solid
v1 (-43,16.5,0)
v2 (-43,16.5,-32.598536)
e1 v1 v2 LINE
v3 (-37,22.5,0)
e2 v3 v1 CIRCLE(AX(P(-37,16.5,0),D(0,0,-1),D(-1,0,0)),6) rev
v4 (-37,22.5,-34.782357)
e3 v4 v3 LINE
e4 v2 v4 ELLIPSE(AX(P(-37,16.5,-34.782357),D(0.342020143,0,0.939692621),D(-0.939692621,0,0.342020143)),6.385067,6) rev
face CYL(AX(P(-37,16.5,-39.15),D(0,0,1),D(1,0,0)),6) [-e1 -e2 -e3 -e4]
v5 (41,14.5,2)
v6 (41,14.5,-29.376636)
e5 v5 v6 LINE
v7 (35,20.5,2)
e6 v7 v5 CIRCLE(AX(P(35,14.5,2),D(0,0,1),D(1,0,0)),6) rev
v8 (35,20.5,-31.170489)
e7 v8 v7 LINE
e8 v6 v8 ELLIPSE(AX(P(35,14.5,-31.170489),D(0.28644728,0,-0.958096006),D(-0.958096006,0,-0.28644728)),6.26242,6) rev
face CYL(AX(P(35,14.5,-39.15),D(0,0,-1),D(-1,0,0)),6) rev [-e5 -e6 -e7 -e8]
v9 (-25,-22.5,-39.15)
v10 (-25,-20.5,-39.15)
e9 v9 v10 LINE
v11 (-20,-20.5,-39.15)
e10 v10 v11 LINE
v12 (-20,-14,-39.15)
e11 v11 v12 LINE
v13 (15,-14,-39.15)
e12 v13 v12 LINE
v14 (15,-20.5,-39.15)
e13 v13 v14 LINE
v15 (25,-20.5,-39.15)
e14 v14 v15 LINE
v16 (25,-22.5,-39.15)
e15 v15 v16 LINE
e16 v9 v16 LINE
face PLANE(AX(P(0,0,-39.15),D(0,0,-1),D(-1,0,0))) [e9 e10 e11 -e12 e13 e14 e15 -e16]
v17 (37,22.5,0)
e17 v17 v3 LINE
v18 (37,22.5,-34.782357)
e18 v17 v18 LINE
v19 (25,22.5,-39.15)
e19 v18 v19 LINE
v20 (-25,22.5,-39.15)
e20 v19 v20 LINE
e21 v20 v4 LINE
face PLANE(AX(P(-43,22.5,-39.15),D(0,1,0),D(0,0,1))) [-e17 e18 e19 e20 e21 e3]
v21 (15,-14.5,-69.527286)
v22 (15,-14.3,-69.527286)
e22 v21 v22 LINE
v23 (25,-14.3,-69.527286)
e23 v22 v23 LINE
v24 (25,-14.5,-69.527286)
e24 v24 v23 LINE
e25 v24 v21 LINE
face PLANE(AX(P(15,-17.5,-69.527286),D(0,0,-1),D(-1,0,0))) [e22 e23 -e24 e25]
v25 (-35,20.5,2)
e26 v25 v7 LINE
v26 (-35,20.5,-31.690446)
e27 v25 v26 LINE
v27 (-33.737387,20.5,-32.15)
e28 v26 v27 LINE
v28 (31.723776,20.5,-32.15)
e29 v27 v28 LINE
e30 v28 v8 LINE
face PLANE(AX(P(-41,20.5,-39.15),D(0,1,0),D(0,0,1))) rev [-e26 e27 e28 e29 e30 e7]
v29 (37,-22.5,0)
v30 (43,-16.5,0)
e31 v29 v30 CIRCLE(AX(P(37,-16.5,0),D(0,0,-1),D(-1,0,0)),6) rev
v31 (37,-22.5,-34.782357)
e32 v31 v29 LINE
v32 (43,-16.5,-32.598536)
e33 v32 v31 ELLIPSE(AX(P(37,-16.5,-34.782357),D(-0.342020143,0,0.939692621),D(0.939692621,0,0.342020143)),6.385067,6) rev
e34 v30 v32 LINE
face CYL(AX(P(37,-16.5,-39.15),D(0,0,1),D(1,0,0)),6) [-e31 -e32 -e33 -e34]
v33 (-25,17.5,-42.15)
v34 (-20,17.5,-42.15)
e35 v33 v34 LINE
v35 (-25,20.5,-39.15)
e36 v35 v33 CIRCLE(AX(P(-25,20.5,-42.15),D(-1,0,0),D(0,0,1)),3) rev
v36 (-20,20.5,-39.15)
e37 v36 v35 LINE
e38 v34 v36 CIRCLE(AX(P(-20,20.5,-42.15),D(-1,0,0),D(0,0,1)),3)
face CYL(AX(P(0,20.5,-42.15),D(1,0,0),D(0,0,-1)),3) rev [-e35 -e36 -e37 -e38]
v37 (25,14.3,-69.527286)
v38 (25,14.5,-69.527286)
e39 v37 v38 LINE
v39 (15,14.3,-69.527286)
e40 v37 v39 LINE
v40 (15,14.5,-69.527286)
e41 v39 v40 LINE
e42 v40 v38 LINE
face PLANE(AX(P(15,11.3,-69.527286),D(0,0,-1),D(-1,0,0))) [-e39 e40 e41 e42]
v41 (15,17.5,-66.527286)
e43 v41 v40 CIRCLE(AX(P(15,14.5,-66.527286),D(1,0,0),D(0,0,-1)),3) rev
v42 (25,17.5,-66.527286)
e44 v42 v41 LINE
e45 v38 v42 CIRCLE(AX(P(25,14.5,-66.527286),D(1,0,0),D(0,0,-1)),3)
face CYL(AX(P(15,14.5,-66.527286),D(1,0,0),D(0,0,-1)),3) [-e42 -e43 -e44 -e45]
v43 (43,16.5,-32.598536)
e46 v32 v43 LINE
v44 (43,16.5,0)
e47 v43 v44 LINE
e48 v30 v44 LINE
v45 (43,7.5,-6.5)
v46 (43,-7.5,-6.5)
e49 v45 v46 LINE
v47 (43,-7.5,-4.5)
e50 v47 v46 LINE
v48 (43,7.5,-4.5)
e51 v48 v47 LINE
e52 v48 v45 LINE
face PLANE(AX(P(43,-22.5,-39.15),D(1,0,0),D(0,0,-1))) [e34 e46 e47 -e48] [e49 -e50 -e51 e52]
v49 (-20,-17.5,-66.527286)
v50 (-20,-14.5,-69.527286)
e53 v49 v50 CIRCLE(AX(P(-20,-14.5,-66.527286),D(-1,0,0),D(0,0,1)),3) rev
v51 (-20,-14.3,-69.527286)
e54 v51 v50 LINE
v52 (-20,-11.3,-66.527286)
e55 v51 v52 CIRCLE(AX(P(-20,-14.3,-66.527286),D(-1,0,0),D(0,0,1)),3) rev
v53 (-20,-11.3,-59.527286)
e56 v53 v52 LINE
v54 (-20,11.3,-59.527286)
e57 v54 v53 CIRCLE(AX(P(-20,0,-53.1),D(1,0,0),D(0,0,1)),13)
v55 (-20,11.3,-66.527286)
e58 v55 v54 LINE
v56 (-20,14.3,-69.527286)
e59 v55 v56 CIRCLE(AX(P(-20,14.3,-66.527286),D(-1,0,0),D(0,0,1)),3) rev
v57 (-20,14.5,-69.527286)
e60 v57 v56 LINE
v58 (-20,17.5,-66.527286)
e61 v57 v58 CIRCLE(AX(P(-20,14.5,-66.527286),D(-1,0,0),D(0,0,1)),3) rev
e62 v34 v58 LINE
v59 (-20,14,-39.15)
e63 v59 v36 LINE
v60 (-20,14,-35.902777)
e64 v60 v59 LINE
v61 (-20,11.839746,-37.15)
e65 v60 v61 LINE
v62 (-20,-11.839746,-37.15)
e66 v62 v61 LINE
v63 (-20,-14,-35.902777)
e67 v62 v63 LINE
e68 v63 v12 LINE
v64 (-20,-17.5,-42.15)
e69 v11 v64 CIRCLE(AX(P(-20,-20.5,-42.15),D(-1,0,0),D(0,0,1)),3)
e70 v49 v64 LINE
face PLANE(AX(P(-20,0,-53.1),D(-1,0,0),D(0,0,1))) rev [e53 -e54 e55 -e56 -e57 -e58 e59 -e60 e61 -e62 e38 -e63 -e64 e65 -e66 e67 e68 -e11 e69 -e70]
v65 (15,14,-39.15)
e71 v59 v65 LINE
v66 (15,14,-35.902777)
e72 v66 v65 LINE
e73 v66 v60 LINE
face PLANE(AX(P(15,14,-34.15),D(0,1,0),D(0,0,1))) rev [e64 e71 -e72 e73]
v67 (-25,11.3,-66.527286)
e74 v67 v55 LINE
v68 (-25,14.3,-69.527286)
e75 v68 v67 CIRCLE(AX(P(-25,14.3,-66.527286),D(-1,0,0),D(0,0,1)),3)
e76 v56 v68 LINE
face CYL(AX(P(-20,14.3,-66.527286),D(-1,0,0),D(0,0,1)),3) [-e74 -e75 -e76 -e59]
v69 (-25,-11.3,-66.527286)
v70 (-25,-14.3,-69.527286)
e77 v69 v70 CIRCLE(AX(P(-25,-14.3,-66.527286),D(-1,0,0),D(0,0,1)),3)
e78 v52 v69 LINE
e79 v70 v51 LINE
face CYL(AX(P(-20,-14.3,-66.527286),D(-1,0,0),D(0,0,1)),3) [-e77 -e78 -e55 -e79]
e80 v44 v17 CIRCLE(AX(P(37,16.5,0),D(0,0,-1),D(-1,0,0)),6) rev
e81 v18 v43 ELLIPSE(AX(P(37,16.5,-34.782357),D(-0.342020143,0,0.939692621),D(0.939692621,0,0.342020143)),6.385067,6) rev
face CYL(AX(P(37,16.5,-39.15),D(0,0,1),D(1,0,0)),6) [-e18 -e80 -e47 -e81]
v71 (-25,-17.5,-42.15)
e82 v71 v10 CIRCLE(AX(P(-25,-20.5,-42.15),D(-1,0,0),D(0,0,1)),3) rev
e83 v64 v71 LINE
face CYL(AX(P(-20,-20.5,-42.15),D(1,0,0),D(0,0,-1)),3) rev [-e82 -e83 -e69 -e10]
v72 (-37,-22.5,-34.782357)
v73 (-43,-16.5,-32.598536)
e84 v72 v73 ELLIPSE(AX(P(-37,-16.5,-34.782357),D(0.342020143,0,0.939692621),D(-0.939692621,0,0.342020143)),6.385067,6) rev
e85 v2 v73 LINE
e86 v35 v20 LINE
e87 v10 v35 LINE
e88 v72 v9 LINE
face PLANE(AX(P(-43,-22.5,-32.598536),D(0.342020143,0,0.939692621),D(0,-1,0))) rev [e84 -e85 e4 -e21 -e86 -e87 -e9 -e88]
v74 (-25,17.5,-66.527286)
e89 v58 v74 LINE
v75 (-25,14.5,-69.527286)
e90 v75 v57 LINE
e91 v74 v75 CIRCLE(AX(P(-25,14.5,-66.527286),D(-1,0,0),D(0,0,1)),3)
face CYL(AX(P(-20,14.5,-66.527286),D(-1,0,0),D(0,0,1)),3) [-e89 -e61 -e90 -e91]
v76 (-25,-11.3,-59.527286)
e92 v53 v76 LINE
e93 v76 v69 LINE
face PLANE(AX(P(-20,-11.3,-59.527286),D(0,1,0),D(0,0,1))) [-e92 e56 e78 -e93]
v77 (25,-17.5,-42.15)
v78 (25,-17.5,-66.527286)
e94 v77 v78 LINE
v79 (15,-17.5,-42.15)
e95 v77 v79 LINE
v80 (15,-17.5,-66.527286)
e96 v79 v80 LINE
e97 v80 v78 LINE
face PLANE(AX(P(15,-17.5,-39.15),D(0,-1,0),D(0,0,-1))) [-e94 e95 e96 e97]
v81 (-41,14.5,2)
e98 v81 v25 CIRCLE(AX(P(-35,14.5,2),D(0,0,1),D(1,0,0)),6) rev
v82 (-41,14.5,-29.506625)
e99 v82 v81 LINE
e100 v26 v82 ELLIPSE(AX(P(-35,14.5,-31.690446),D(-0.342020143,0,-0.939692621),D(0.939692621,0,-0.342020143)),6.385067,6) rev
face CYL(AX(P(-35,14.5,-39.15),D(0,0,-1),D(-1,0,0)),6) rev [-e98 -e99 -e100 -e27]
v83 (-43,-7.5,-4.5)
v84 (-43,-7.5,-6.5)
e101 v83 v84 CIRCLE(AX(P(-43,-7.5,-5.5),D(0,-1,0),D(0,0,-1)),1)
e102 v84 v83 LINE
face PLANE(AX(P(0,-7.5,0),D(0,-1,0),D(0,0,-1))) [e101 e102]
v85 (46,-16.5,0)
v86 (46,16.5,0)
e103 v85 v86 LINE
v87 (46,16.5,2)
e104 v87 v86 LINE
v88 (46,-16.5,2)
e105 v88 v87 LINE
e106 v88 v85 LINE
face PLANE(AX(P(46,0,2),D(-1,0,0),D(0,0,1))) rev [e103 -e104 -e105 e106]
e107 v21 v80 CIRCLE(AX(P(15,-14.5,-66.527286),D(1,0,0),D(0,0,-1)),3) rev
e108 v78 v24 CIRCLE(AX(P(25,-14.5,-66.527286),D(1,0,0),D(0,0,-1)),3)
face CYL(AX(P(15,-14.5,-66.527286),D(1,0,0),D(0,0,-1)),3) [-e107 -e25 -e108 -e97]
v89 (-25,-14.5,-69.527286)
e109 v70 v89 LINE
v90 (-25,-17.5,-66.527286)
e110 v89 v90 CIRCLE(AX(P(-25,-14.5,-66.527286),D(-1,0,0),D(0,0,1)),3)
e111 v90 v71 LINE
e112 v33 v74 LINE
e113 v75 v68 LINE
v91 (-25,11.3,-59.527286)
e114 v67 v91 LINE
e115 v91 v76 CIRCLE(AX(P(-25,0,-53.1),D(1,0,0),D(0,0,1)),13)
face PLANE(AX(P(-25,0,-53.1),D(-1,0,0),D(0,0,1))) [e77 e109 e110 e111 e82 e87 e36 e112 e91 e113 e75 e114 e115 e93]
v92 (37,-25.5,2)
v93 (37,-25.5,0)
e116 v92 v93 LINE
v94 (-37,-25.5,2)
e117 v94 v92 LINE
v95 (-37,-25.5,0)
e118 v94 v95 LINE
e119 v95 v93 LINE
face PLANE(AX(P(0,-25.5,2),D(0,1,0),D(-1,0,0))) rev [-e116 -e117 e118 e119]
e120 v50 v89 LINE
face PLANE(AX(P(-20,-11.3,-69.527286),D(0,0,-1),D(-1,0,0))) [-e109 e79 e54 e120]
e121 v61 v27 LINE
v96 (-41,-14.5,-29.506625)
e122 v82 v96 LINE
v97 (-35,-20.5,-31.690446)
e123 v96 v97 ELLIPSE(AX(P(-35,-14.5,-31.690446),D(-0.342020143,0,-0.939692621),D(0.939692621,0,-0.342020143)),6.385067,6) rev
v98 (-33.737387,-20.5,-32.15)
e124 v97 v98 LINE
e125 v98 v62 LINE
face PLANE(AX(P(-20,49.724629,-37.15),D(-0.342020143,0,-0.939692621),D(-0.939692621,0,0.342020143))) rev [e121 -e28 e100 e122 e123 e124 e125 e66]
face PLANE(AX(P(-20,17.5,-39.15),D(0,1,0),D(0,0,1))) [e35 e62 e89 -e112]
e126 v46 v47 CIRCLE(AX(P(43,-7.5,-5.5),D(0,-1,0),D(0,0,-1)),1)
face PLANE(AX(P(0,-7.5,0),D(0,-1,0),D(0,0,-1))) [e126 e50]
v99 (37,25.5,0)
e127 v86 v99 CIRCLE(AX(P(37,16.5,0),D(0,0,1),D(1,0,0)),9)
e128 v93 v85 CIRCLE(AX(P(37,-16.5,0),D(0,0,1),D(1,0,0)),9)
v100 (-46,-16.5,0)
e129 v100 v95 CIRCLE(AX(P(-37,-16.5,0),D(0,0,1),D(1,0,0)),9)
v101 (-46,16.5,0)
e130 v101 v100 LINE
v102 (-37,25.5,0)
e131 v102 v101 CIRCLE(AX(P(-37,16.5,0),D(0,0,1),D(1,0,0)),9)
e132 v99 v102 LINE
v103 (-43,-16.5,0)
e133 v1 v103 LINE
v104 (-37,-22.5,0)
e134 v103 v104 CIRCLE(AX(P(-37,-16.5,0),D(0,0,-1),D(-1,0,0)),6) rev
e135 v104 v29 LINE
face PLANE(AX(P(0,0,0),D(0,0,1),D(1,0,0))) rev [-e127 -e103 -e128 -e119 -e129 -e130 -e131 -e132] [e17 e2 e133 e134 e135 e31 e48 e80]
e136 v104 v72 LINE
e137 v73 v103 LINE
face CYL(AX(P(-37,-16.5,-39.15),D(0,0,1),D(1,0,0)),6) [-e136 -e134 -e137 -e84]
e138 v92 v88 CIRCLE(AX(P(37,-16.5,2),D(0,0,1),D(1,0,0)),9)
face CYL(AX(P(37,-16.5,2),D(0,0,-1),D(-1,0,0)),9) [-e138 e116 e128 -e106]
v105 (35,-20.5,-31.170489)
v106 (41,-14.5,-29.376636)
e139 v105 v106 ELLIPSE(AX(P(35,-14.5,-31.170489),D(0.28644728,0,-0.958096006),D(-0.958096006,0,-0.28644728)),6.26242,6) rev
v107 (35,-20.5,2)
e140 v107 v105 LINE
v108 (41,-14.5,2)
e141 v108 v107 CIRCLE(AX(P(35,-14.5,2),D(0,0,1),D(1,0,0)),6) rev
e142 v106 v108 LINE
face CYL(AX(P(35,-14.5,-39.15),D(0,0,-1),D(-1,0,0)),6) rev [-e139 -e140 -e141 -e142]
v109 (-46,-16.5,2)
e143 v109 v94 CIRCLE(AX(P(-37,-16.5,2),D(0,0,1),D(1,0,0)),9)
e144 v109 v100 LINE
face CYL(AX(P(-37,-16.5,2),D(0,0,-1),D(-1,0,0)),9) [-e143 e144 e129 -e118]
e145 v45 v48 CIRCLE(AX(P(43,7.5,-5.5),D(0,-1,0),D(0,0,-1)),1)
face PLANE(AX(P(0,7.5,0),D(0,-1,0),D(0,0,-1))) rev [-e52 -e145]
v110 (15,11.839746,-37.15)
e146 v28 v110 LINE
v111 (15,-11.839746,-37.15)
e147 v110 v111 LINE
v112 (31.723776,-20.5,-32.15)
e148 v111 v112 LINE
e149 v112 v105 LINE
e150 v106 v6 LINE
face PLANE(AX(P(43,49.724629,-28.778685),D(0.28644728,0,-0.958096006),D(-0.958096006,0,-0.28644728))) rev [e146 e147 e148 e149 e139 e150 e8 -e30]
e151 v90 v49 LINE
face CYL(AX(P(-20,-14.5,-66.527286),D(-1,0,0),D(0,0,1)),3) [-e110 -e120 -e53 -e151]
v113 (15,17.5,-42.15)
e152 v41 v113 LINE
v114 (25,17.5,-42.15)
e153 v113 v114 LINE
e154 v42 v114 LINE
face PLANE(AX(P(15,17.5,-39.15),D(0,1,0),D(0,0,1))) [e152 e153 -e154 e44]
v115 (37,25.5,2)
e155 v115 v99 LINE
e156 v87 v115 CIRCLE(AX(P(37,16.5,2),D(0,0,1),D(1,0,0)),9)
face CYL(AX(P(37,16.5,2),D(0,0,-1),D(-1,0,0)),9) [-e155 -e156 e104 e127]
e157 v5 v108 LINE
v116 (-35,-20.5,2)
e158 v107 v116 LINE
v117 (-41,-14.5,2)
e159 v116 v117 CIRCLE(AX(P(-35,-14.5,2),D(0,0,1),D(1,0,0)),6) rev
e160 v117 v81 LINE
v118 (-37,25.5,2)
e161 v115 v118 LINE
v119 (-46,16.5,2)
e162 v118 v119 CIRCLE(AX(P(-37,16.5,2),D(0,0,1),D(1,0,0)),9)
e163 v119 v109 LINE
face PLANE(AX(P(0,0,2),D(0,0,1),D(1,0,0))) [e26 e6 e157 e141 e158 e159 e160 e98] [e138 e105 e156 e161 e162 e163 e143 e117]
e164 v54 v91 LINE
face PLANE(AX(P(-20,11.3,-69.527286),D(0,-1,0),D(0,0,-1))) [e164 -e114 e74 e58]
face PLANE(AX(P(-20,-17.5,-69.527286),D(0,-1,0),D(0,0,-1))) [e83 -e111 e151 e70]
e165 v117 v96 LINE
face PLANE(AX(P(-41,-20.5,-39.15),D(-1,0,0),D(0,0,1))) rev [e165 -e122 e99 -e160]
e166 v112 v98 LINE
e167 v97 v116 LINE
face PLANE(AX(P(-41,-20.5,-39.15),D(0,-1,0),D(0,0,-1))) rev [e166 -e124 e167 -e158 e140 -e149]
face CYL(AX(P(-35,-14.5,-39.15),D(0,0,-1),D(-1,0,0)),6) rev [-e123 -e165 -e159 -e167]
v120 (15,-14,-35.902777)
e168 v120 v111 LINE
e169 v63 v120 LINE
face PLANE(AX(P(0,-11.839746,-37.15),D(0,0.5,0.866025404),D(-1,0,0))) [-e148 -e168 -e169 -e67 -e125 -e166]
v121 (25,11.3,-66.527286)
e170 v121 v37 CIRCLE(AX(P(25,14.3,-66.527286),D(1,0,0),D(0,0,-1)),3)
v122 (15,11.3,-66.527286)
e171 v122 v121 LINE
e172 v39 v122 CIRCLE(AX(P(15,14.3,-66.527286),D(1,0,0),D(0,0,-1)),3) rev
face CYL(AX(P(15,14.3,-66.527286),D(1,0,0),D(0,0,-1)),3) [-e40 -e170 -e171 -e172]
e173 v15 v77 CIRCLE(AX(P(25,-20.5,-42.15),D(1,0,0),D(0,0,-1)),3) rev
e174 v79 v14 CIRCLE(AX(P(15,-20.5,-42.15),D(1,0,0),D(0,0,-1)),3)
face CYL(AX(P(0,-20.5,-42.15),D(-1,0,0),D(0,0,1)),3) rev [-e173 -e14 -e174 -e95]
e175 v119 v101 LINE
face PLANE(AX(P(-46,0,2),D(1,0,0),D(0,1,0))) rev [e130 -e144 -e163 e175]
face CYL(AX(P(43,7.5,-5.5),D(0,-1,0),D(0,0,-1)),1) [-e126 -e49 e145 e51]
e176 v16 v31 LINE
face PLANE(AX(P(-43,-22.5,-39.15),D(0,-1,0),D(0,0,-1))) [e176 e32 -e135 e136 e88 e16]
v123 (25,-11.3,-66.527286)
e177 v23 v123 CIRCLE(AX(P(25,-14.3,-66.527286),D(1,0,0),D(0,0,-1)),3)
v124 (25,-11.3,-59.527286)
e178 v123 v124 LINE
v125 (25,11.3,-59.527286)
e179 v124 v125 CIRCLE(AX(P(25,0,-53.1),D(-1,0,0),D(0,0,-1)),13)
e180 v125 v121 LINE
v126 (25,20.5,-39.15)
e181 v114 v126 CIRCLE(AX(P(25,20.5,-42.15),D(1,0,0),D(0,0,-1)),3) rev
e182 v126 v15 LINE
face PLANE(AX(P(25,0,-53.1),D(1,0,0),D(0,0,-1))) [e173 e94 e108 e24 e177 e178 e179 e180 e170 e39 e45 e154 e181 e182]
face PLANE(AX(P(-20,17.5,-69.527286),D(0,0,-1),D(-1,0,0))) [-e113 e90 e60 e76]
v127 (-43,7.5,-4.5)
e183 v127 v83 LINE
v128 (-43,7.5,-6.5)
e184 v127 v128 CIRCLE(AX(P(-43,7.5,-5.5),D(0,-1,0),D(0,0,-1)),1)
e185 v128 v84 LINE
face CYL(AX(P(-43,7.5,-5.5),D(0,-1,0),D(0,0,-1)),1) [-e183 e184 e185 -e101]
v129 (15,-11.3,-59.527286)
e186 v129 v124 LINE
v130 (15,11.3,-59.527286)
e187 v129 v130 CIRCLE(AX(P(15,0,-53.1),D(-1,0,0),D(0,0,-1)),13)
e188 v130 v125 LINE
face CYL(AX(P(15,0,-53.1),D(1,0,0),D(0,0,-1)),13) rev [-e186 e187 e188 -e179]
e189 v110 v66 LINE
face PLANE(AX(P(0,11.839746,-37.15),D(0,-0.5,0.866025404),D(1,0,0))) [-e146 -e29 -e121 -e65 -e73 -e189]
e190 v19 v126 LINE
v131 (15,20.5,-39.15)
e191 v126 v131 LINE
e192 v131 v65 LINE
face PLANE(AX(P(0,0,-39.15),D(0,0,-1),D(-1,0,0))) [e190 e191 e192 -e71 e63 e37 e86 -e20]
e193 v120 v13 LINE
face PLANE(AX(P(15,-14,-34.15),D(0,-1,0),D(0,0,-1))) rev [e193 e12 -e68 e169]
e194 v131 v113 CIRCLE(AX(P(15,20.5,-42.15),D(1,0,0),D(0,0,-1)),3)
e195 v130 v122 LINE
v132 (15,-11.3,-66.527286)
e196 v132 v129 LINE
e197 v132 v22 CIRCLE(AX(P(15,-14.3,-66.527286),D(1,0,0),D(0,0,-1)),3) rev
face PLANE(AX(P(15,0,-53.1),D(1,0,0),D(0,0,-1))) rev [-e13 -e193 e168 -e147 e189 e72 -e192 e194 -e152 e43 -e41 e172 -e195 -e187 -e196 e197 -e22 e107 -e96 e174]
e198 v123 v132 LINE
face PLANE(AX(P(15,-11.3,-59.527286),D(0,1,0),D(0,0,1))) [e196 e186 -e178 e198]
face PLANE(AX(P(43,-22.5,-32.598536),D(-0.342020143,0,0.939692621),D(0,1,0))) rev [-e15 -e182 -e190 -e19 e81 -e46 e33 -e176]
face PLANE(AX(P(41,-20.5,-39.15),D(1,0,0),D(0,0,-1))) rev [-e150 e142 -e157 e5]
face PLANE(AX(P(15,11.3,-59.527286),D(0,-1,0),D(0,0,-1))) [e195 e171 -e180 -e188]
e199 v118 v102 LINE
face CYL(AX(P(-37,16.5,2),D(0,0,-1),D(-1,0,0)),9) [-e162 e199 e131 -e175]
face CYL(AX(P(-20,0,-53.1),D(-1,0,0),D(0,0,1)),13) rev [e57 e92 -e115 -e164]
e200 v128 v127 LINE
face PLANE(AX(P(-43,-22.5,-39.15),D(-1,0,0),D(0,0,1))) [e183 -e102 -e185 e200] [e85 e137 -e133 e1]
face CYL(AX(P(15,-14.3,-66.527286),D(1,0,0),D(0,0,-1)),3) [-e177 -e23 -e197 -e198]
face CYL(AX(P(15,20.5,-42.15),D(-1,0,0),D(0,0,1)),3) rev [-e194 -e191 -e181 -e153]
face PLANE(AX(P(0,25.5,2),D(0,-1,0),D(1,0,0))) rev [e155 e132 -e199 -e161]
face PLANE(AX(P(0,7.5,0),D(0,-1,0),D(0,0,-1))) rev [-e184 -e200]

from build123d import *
from OCP.BRepFilletAPI import BRepFilletAPI_MakeChamfer

# Parameters (mm, degrees)
SKETCH1_W           = 86
SKETCH1_H           = 45
SKETCH1_W_2         = 82
SKETCH1_H_2         = 41
BOSS_EXTRUDE1_DEPTH = 39.15
SKETCH2_W           = 86
SKETCH2_H           = 45
BOSS_EXTRUDE2_DEPTH = 2
BOSS_EXTRUDE3_DEPTH = 10
BOSS_EXTRUDE4_START = -5
BOSS_EXTRUDE4_DEPTH = 5
FILLET2_R           = 3
SKETCH5_W           = 35
SKETCH5_H           = 28
CUT_EXTRUDE1_DEPTH  = 5
BOSS_EXTRUDE5_REACH = 94.369
CHAMFER1_SIZE       = 8.660254038
CHAMFER1_SIZE_2     = 5
CHAMFER2_SIZE       = 6.551464217
CHAMFER2_SIZE_2     = 18
FILLET3_R           = 6
BOSS_EXTRUDE6_DEPTH = 2
BOSS_EXTRUDE7_DEPTH = 15


# Some blends are built 0.0001 mm under size
with BuildPart() as part:
    # Sketch1 → Boss-Extrude1 (new body)
    with BuildSketch(Plane.XY):
        Rectangle(SKETCH1_W, SKETCH1_H)
        Rectangle(SKETCH1_W_2, SKETCH1_H_2, mode=Mode.SUBTRACT)
    extrude(amount=-BOSS_EXTRUDE1_DEPTH)

    # Sketch2 → Boss-Extrude2 (add)
    with BuildSketch(Plane(origin=(0, 0, -39.15), x_dir=(-1, 0, 0), z_dir=(0, 0, -1))):
        Rectangle(SKETCH2_W, SKETCH2_H)
    extrude(amount=-BOSS_EXTRUDE2_DEPTH)

    # Sketch3 → Boss-Extrude3 (add)
    with BuildSketch(Plane(origin=(25, 0, 0), x_dir=(0, 0, -1), z_dir=(1, 0, 0))):
        with BuildLine():
            Line((69.527285586, 11.3), (69.527285586, 17.5))
            Line((69.527285586, 17.5), (39.15, 17.5))
            Line((39.15, 17.5), (39.15, -17.5))
            Line((39.15, -17.5), (69.527285586, -17.5))
            Line((69.527285586, -17.5), (69.527285586, -11.3))
            Line((69.527285586, -11.3), (59.527285586, -11.3))
            ThreePointArc((59.527285586, -11.3), (40.1, 0), (59.527285586, 11.3))
            Line((59.527285586, 11.3), (69.527285586, 11.3))
        make_face()
    extrude(amount=-BOSS_EXTRUDE3_DEPTH)

    # Sketch4 → Boss-Extrude4 (add)
    with BuildSketch(Plane.ZY.offset(25).offset(BOSS_EXTRUDE4_START)):
        with BuildLine():
            Line((-39.15, -17.5), (-39.15, 17.5))
            Line((-39.15, 17.5), (-69.527285586, 17.5))
            Line((-69.527285586, 17.5), (-69.527285586, 11.3))
            Line((-69.527285586, 11.3), (-59.527285586, 11.3))
            ThreePointArc((-59.527285586, 11.3), (-40.1, 0), (-59.527285586, -11.3))
            Line((-59.527285586, -11.3), (-69.527285586, -11.3))
            Line((-69.527285586, -11.3), (-69.527285586, -17.5))
            Line((-69.527285586, -17.5), (-39.15, -17.5))
        make_face()
    extrude(amount=BOSS_EXTRUDE4_DEPTH)

    # Fillet2
    fillet2_edges = [part.edges().sort_by_distance(p)[0] for p in [
        (20, -11.3, -69.527285586),
        (20, -17.5, -69.527285586),
        (20, -17.5, -39.15),
        (20, 17.5, -39.15),
        (20, 17.5, -69.527285586),
        (20, 11.3, -69.527285586),
        (-22.5, -17.5, -39.15),
        (-22.5, -17.5, -69.527285586),
        (-22.5, -11.3, -69.527285586),
        (-22.5, 11.3, -69.527285586),
        (-22.5, 17.5, -69.527285586),
        (-22.5, 17.5, -39.15),
    ]]
    fillet(fillet2_edges, radius=FILLET2_R)

    # Sketch5 → Cut-Extrude1 (cut)
    with BuildSketch(Plane(origin=(0, 0, -39.15), x_dir=(-1, 0, 0), z_dir=(0, 0, -1))):
        with Locations((2.5, 0)):
            Rectangle(SKETCH5_W, SKETCH5_H)
    extrude(amount=-CUT_EXTRUDE1_DEPTH, mode=Mode.SUBTRACT)

    # Boss-Extrude5: up to this face of the body (flat: up to its plane)
    boss_extrude5_end = Plane(part.part.faces().sort_by_distance((0, 20.5, -18.575))[0])
    # Sketch6 → Boss-Extrude5 (add, up to the picked face)
    with BuildSketch(Plane(origin=(0, -20.5, 0), x_dir=(1, 0, 0), z_dir=(0, 1, 0)), mode=Mode.PRIVATE) as boss_extrude5_sk1:
        Polygon((-20, 37.15), (-43, 28.778684612), (-43, 37.15), align=None)
    boss_extrude5_tool1 = split(extrude(boss_extrude5_sk1.sketch, amount=BOSS_EXTRUDE5_REACH, mode=Mode.PRIVATE), bisect_by=boss_extrude5_end, keep=Keep.BOTH, mode=Mode.PRIVATE)
    # Sketch6 → Boss-Extrude5 (add, up to the picked face)
    with BuildSketch(Plane(origin=(0, -20.5, 0), x_dir=(1, 0, 0), z_dir=(0, 1, 0)), mode=Mode.PRIVATE) as boss_extrude5_sk2:
        Polygon((15, 37.15), (43, 37.15), (43, 28.778684612), align=None)
    boss_extrude5_tool2 = split(extrude(boss_extrude5_sk2.sketch, amount=BOSS_EXTRUDE5_REACH, mode=Mode.PRIVATE), bisect_by=boss_extrude5_end, keep=Keep.BOTH, mode=Mode.PRIVATE)
    add(boss_extrude5_tool1.solids().sort_by(Axis((-35.333333, -20.5, -34.359562), (0, 1, 0)))[0])
    add(boss_extrude5_tool2.solids().sort_by(Axis((33.666667, -20.5, -34.359562), (0, 1, 0)))[0])

    # Chamfer1
    # the kernel refuses this chamfer: 8.660254038, 5 mm, written as the material it adds along each edge
    with BuildSketch(Plane(origin=(-42.404819853, 20.5, -37.15), x_dir=(0, -0.999813220622208, -0.019326765612700494), z_dir=(1, 0, 0))) as chamfer1_piece_1_section:
        Polygon((CHAMFER1_SIZE * 0.999813220604, -CHAMFER1_SIZE * 0.0193267656124), (-CHAMFER1_SIZE_2 * 0.0193267656127, -CHAMFER1_SIZE_2 * 0.999813220622), (0, 0), align=None)
    chamfer1_piece_1 = extrude(amount=79.809639706, mode=Mode.PRIVATE)
    chamfer1_piece_1 = split(chamfer1_piece_1, bisect_by=Plane(origin=(-20, 13.459936491, -36.526388375), z_dir=(-1, 0, 0)), keep=Keep.TOP, mode=Mode.PRIVATE)
    add(chamfer1_piece_1)
    with BuildSketch(Plane(origin=(-42.404819853, 20.5, -37.15), x_dir=(0, -0.999813220622208, -0.019326765612700494), z_dir=(1, 0, 0))) as chamfer1_piece_2_section:
        Polygon((CHAMFER1_SIZE * 0.999813220604, -CHAMFER1_SIZE * 0.0193267656124), (-CHAMFER1_SIZE_2 * 0.0193267656127, -CHAMFER1_SIZE_2 * 0.999813220622), (0, 0), align=None)
    chamfer1_piece_2 = extrude(amount=79.809639706, mode=Mode.PRIVATE)
    chamfer1_piece_2 = split(chamfer1_piece_2, bisect_by=Plane(origin=(-2.5, 14, -35.400332947), z_dir=(0, 1, 0)), keep=Keep.TOP, mode=Mode.PRIVATE)
    add(chamfer1_piece_2)
    with BuildSketch(Plane(origin=(-42.404819853, 20.5, -37.15), x_dir=(0, -0.999813220622208, -0.019326765612700494), z_dir=(1, 0, 0))) as chamfer1_piece_3_section:
        Polygon((CHAMFER1_SIZE * 0.999813220604, -CHAMFER1_SIZE * 0.0193267656124), (-CHAMFER1_SIZE_2 * 0.0193267656127, -CHAMFER1_SIZE_2 * 0.999813220622), (0, 0), align=None)
    chamfer1_piece_3 = extrude(amount=79.809639706, mode=Mode.PRIVATE)
    chamfer1_piece_3 = split(chamfer1_piece_3, bisect_by=Plane(origin=(15, 13.459936491, -36.526388375), z_dir=(1, 0, 0)), keep=Keep.TOP, mode=Mode.PRIVATE)
    add(chamfer1_piece_3)
    with BuildSketch(Plane(origin=(37.404819853, -20.5, -37.15), x_dir=(0, 0.999813220622208, -0.019326765612700494), z_dir=(-1, 0, 0))) as chamfer1_piece_4_section:
        Polygon((CHAMFER1_SIZE * 0.999813220604, -CHAMFER1_SIZE * 0.0193267656124), (-CHAMFER1_SIZE_2 * 0.0193267656127, -CHAMFER1_SIZE_2 * 0.999813220622), (0, 0), align=None)
    chamfer1_piece_4 = extrude(amount=79.809639706, mode=Mode.PRIVATE)
    chamfer1_piece_4 = split(chamfer1_piece_4, bisect_by=Plane(origin=(15, -13.459936491, -36.526388375), z_dir=(1, 0, 0)), keep=Keep.TOP, mode=Mode.PRIVATE)
    add(chamfer1_piece_4)
    with BuildSketch(Plane(origin=(37.404819853, -20.5, -37.15), x_dir=(0, 0.999813220622208, -0.019326765612700494), z_dir=(-1, 0, 0))) as chamfer1_piece_5_section:
        Polygon((CHAMFER1_SIZE * 0.999813220604, -CHAMFER1_SIZE * 0.0193267656124), (-CHAMFER1_SIZE_2 * 0.0193267656127, -CHAMFER1_SIZE_2 * 0.999813220622), (0, 0), align=None)
    chamfer1_piece_5 = extrude(amount=79.809639706, mode=Mode.PRIVATE)
    chamfer1_piece_5 = split(chamfer1_piece_5, bisect_by=Plane(origin=(-2.5, -14, -35.400332947), z_dir=(0, -1, 0)), keep=Keep.TOP, mode=Mode.PRIVATE)
    add(chamfer1_piece_5)
    with BuildSketch(Plane(origin=(37.404819853, -20.5, -37.15), x_dir=(0, 0.999813220622208, -0.019326765612700494), z_dir=(-1, 0, 0))) as chamfer1_piece_6_section:
        Polygon((CHAMFER1_SIZE * 0.999813220604, -CHAMFER1_SIZE * 0.0193267656124), (-CHAMFER1_SIZE_2 * 0.0193267656127, -CHAMFER1_SIZE_2 * 0.999813220622), (0, 0), align=None)
    chamfer1_piece_6 = extrude(amount=79.809639706, mode=Mode.PRIVATE)
    chamfer1_piece_6 = split(chamfer1_piece_6, bisect_by=Plane(origin=(-20, -13.459936491, -36.526388375), z_dir=(-1, 0, 0)), keep=Keep.TOP, mode=Mode.PRIVATE)
    add(chamfer1_piece_6)

    # Chamfer2
    chamfer2_edges_1 = [part.edges().sort_by_distance(p)[0] for p in [
        (-43, 0, -39.15),
    ]]
    chamfer2_side_1 = [part.faces().sort_by_distance(p)[0] for p in [
        (-43, 0, -39.018970716),
    ]]
    chamfer2_edges_2 = [part.edges().sort_by_distance(p)[0] for p in [
        (43, 0, -39.15),
    ]]
    chamfer2_side_2 = [part.faces().sort_by_distance(p)[0] for p in [
        (42.868970716, 0, -39.15),
    ]]
    chamfer2 = BRepFilletAPI_MakeChamfer(part.part.solid().wrapped)
    for e in chamfer2_edges_1:
        chamfer2.Add(CHAMFER2_SIZE - 0.0001, CHAMFER2_SIZE_2 - 0.0001, e.wrapped, chamfer2_side_1[0].wrapped)
    for e in chamfer2_edges_2:
        chamfer2.Add(CHAMFER2_SIZE_2 - 0.0001, CHAMFER2_SIZE - 0.0001, e.wrapped, chamfer2_side_2[0].wrapped)
    add(Compound.cast(chamfer2.Shape()), mode=Mode.REPLACE)  # a hair under: the kernel refuses the full size

    # Fillet3
    fillet3_edges = [part.edges().sort_by_distance(p)[0] for p in [
        (41, -20.5, -14.688317856),
        (41, 20.5, -14.688317856),
        (-41, 20.5, -14.75331254),
        (-41, -20.5, -14.75331254),
        (-43, -22.5, -16.299317891),
        (-43, 22.5, -16.299317891),
        (43, -22.5, -16.299317891),
        (43, 22.5, -16.299317891),
    ]]
    fillet(fillet3_edges, radius=FILLET3_R)

    # Sketch7 → Boss-Extrude6 (add)
    # profile 1 of 2: a face of its own
    with BuildSketch(Plane.XY):
        with BuildLine():
            Line((46, -16.5), (46, 16.5))
            ThreePointArc((46, 16.5), (43.363961031, 22.863961031), (37, 25.5))
            Line((37, 25.5), (-37, 25.5))
            ThreePointArc((-37, 25.5), (-43.363961031, 22.863961031), (-46, 16.5))
            Line((-46, 16.5), (-46, -16.5))
            ThreePointArc((-46, -16.5), (-43.363961031, -22.863961031), (-37, -25.5))
            Line((-37, -25.5), (37, -25.5))
            ThreePointArc((37, -25.5), (43.363961031, -22.863961031), (46, -16.5))
        make_face()
        with BuildLine():
            Line((37, 22.5), (-37, 22.5))
            ThreePointArc((-37, 22.5), (-41.242640687, 20.742640687), (-43, 16.5))
            Line((-43, 16.5), (-43, -16.5))
            ThreePointArc((-43, -16.5), (-41.242640687, -20.742640687), (-37, -22.5))
            Line((-37, -22.5), (37, -22.5))
            ThreePointArc((37, -22.5), (41.242640687, -20.742640687), (43, -16.5))
            Line((43, -16.5), (43, 16.5))
            ThreePointArc((43, 16.5), (41.242640687, 20.742640687), (37, 22.5))
        make_face(mode=Mode.SUBTRACT)
    # profile 2 of 2: a face of its own
    with BuildSketch(Plane.XY):
        with BuildLine():
            ThreePointArc((43, 16.5), (41.242640687, 20.742640687), (37, 22.5))
            Line((37, 22.5), (-37, 22.5))
            ThreePointArc((-37, 22.5), (-41.242640687, 20.742640687), (-43, 16.5))
            Line((-43, 16.5), (-43, -16.5))
            ThreePointArc((-43, -16.5), (-41.242640687, -20.742640687), (-37, -22.5))
            Line((-37, -22.5), (37, -22.5))
            ThreePointArc((37, -22.5), (41.242640687, -20.742640687), (43, -16.5))
            Line((43, -16.5), (43, 16.5))
        make_face()
        with BuildLine():
            ThreePointArc((35, 20.5), (39.242640687, 18.742640687), (41, 14.5))
            Line((41, 14.5), (41, -14.5))
            ThreePointArc((41, -14.5), (39.242640687, -18.742640687), (35, -20.5))
            Line((35, -20.5), (-35, -20.5))
            ThreePointArc((-35, -20.5), (-39.242640687, -18.742640687), (-41, -14.5))
            Line((-41, -14.5), (-41, 14.5))
            ThreePointArc((-41, 14.5), (-39.242640687, 18.742640687), (-35, 20.5))
            Line((-35, 20.5), (35, 20.5))
        make_face(mode=Mode.SUBTRACT)
    extrude(amount=BOSS_EXTRUDE6_DEPTH)

    # Sketch9 → Boss-Extrude7 (add)
    with BuildSketch(Plane(origin=(0, -7.5, 0), x_dir=(-1, 0, 0), z_dir=(0, -1, 0))):
        with BuildLine():
            ThreePointArc((44, 5.5), (43.707106781, 6.207106781), (43, 6.5))
            Line((43, 6.5), (43, 4.5))
            ThreePointArc((43, 4.5), (43.707106781, 4.792893219), (44, 5.5))
        make_face()
        with BuildLine():
            Line((43, 4.5), (43, 6.5))
            ThreePointArc((43, 6.5), (42, 5.5), (43, 4.5))
        make_face()
        with BuildLine():
            ThreePointArc((-43, 6.5), (-44, 5.5), (-43, 4.5))
            Line((-43, 4.5), (-43, 6.5))
        make_face()
        with BuildLine():
            Line((-43, 6.5), (-43, 4.5))
            ThreePointArc((-43, 4.5), (-42.292893219, 4.792893219), (-42, 5.5))
            ThreePointArc((-42, 5.5), (-42.292893219, 6.207106781), (-43, 6.5))
        make_face()
    extrude(amount=-BOSS_EXTRUDE7_DEPTH)


solid = part.part
